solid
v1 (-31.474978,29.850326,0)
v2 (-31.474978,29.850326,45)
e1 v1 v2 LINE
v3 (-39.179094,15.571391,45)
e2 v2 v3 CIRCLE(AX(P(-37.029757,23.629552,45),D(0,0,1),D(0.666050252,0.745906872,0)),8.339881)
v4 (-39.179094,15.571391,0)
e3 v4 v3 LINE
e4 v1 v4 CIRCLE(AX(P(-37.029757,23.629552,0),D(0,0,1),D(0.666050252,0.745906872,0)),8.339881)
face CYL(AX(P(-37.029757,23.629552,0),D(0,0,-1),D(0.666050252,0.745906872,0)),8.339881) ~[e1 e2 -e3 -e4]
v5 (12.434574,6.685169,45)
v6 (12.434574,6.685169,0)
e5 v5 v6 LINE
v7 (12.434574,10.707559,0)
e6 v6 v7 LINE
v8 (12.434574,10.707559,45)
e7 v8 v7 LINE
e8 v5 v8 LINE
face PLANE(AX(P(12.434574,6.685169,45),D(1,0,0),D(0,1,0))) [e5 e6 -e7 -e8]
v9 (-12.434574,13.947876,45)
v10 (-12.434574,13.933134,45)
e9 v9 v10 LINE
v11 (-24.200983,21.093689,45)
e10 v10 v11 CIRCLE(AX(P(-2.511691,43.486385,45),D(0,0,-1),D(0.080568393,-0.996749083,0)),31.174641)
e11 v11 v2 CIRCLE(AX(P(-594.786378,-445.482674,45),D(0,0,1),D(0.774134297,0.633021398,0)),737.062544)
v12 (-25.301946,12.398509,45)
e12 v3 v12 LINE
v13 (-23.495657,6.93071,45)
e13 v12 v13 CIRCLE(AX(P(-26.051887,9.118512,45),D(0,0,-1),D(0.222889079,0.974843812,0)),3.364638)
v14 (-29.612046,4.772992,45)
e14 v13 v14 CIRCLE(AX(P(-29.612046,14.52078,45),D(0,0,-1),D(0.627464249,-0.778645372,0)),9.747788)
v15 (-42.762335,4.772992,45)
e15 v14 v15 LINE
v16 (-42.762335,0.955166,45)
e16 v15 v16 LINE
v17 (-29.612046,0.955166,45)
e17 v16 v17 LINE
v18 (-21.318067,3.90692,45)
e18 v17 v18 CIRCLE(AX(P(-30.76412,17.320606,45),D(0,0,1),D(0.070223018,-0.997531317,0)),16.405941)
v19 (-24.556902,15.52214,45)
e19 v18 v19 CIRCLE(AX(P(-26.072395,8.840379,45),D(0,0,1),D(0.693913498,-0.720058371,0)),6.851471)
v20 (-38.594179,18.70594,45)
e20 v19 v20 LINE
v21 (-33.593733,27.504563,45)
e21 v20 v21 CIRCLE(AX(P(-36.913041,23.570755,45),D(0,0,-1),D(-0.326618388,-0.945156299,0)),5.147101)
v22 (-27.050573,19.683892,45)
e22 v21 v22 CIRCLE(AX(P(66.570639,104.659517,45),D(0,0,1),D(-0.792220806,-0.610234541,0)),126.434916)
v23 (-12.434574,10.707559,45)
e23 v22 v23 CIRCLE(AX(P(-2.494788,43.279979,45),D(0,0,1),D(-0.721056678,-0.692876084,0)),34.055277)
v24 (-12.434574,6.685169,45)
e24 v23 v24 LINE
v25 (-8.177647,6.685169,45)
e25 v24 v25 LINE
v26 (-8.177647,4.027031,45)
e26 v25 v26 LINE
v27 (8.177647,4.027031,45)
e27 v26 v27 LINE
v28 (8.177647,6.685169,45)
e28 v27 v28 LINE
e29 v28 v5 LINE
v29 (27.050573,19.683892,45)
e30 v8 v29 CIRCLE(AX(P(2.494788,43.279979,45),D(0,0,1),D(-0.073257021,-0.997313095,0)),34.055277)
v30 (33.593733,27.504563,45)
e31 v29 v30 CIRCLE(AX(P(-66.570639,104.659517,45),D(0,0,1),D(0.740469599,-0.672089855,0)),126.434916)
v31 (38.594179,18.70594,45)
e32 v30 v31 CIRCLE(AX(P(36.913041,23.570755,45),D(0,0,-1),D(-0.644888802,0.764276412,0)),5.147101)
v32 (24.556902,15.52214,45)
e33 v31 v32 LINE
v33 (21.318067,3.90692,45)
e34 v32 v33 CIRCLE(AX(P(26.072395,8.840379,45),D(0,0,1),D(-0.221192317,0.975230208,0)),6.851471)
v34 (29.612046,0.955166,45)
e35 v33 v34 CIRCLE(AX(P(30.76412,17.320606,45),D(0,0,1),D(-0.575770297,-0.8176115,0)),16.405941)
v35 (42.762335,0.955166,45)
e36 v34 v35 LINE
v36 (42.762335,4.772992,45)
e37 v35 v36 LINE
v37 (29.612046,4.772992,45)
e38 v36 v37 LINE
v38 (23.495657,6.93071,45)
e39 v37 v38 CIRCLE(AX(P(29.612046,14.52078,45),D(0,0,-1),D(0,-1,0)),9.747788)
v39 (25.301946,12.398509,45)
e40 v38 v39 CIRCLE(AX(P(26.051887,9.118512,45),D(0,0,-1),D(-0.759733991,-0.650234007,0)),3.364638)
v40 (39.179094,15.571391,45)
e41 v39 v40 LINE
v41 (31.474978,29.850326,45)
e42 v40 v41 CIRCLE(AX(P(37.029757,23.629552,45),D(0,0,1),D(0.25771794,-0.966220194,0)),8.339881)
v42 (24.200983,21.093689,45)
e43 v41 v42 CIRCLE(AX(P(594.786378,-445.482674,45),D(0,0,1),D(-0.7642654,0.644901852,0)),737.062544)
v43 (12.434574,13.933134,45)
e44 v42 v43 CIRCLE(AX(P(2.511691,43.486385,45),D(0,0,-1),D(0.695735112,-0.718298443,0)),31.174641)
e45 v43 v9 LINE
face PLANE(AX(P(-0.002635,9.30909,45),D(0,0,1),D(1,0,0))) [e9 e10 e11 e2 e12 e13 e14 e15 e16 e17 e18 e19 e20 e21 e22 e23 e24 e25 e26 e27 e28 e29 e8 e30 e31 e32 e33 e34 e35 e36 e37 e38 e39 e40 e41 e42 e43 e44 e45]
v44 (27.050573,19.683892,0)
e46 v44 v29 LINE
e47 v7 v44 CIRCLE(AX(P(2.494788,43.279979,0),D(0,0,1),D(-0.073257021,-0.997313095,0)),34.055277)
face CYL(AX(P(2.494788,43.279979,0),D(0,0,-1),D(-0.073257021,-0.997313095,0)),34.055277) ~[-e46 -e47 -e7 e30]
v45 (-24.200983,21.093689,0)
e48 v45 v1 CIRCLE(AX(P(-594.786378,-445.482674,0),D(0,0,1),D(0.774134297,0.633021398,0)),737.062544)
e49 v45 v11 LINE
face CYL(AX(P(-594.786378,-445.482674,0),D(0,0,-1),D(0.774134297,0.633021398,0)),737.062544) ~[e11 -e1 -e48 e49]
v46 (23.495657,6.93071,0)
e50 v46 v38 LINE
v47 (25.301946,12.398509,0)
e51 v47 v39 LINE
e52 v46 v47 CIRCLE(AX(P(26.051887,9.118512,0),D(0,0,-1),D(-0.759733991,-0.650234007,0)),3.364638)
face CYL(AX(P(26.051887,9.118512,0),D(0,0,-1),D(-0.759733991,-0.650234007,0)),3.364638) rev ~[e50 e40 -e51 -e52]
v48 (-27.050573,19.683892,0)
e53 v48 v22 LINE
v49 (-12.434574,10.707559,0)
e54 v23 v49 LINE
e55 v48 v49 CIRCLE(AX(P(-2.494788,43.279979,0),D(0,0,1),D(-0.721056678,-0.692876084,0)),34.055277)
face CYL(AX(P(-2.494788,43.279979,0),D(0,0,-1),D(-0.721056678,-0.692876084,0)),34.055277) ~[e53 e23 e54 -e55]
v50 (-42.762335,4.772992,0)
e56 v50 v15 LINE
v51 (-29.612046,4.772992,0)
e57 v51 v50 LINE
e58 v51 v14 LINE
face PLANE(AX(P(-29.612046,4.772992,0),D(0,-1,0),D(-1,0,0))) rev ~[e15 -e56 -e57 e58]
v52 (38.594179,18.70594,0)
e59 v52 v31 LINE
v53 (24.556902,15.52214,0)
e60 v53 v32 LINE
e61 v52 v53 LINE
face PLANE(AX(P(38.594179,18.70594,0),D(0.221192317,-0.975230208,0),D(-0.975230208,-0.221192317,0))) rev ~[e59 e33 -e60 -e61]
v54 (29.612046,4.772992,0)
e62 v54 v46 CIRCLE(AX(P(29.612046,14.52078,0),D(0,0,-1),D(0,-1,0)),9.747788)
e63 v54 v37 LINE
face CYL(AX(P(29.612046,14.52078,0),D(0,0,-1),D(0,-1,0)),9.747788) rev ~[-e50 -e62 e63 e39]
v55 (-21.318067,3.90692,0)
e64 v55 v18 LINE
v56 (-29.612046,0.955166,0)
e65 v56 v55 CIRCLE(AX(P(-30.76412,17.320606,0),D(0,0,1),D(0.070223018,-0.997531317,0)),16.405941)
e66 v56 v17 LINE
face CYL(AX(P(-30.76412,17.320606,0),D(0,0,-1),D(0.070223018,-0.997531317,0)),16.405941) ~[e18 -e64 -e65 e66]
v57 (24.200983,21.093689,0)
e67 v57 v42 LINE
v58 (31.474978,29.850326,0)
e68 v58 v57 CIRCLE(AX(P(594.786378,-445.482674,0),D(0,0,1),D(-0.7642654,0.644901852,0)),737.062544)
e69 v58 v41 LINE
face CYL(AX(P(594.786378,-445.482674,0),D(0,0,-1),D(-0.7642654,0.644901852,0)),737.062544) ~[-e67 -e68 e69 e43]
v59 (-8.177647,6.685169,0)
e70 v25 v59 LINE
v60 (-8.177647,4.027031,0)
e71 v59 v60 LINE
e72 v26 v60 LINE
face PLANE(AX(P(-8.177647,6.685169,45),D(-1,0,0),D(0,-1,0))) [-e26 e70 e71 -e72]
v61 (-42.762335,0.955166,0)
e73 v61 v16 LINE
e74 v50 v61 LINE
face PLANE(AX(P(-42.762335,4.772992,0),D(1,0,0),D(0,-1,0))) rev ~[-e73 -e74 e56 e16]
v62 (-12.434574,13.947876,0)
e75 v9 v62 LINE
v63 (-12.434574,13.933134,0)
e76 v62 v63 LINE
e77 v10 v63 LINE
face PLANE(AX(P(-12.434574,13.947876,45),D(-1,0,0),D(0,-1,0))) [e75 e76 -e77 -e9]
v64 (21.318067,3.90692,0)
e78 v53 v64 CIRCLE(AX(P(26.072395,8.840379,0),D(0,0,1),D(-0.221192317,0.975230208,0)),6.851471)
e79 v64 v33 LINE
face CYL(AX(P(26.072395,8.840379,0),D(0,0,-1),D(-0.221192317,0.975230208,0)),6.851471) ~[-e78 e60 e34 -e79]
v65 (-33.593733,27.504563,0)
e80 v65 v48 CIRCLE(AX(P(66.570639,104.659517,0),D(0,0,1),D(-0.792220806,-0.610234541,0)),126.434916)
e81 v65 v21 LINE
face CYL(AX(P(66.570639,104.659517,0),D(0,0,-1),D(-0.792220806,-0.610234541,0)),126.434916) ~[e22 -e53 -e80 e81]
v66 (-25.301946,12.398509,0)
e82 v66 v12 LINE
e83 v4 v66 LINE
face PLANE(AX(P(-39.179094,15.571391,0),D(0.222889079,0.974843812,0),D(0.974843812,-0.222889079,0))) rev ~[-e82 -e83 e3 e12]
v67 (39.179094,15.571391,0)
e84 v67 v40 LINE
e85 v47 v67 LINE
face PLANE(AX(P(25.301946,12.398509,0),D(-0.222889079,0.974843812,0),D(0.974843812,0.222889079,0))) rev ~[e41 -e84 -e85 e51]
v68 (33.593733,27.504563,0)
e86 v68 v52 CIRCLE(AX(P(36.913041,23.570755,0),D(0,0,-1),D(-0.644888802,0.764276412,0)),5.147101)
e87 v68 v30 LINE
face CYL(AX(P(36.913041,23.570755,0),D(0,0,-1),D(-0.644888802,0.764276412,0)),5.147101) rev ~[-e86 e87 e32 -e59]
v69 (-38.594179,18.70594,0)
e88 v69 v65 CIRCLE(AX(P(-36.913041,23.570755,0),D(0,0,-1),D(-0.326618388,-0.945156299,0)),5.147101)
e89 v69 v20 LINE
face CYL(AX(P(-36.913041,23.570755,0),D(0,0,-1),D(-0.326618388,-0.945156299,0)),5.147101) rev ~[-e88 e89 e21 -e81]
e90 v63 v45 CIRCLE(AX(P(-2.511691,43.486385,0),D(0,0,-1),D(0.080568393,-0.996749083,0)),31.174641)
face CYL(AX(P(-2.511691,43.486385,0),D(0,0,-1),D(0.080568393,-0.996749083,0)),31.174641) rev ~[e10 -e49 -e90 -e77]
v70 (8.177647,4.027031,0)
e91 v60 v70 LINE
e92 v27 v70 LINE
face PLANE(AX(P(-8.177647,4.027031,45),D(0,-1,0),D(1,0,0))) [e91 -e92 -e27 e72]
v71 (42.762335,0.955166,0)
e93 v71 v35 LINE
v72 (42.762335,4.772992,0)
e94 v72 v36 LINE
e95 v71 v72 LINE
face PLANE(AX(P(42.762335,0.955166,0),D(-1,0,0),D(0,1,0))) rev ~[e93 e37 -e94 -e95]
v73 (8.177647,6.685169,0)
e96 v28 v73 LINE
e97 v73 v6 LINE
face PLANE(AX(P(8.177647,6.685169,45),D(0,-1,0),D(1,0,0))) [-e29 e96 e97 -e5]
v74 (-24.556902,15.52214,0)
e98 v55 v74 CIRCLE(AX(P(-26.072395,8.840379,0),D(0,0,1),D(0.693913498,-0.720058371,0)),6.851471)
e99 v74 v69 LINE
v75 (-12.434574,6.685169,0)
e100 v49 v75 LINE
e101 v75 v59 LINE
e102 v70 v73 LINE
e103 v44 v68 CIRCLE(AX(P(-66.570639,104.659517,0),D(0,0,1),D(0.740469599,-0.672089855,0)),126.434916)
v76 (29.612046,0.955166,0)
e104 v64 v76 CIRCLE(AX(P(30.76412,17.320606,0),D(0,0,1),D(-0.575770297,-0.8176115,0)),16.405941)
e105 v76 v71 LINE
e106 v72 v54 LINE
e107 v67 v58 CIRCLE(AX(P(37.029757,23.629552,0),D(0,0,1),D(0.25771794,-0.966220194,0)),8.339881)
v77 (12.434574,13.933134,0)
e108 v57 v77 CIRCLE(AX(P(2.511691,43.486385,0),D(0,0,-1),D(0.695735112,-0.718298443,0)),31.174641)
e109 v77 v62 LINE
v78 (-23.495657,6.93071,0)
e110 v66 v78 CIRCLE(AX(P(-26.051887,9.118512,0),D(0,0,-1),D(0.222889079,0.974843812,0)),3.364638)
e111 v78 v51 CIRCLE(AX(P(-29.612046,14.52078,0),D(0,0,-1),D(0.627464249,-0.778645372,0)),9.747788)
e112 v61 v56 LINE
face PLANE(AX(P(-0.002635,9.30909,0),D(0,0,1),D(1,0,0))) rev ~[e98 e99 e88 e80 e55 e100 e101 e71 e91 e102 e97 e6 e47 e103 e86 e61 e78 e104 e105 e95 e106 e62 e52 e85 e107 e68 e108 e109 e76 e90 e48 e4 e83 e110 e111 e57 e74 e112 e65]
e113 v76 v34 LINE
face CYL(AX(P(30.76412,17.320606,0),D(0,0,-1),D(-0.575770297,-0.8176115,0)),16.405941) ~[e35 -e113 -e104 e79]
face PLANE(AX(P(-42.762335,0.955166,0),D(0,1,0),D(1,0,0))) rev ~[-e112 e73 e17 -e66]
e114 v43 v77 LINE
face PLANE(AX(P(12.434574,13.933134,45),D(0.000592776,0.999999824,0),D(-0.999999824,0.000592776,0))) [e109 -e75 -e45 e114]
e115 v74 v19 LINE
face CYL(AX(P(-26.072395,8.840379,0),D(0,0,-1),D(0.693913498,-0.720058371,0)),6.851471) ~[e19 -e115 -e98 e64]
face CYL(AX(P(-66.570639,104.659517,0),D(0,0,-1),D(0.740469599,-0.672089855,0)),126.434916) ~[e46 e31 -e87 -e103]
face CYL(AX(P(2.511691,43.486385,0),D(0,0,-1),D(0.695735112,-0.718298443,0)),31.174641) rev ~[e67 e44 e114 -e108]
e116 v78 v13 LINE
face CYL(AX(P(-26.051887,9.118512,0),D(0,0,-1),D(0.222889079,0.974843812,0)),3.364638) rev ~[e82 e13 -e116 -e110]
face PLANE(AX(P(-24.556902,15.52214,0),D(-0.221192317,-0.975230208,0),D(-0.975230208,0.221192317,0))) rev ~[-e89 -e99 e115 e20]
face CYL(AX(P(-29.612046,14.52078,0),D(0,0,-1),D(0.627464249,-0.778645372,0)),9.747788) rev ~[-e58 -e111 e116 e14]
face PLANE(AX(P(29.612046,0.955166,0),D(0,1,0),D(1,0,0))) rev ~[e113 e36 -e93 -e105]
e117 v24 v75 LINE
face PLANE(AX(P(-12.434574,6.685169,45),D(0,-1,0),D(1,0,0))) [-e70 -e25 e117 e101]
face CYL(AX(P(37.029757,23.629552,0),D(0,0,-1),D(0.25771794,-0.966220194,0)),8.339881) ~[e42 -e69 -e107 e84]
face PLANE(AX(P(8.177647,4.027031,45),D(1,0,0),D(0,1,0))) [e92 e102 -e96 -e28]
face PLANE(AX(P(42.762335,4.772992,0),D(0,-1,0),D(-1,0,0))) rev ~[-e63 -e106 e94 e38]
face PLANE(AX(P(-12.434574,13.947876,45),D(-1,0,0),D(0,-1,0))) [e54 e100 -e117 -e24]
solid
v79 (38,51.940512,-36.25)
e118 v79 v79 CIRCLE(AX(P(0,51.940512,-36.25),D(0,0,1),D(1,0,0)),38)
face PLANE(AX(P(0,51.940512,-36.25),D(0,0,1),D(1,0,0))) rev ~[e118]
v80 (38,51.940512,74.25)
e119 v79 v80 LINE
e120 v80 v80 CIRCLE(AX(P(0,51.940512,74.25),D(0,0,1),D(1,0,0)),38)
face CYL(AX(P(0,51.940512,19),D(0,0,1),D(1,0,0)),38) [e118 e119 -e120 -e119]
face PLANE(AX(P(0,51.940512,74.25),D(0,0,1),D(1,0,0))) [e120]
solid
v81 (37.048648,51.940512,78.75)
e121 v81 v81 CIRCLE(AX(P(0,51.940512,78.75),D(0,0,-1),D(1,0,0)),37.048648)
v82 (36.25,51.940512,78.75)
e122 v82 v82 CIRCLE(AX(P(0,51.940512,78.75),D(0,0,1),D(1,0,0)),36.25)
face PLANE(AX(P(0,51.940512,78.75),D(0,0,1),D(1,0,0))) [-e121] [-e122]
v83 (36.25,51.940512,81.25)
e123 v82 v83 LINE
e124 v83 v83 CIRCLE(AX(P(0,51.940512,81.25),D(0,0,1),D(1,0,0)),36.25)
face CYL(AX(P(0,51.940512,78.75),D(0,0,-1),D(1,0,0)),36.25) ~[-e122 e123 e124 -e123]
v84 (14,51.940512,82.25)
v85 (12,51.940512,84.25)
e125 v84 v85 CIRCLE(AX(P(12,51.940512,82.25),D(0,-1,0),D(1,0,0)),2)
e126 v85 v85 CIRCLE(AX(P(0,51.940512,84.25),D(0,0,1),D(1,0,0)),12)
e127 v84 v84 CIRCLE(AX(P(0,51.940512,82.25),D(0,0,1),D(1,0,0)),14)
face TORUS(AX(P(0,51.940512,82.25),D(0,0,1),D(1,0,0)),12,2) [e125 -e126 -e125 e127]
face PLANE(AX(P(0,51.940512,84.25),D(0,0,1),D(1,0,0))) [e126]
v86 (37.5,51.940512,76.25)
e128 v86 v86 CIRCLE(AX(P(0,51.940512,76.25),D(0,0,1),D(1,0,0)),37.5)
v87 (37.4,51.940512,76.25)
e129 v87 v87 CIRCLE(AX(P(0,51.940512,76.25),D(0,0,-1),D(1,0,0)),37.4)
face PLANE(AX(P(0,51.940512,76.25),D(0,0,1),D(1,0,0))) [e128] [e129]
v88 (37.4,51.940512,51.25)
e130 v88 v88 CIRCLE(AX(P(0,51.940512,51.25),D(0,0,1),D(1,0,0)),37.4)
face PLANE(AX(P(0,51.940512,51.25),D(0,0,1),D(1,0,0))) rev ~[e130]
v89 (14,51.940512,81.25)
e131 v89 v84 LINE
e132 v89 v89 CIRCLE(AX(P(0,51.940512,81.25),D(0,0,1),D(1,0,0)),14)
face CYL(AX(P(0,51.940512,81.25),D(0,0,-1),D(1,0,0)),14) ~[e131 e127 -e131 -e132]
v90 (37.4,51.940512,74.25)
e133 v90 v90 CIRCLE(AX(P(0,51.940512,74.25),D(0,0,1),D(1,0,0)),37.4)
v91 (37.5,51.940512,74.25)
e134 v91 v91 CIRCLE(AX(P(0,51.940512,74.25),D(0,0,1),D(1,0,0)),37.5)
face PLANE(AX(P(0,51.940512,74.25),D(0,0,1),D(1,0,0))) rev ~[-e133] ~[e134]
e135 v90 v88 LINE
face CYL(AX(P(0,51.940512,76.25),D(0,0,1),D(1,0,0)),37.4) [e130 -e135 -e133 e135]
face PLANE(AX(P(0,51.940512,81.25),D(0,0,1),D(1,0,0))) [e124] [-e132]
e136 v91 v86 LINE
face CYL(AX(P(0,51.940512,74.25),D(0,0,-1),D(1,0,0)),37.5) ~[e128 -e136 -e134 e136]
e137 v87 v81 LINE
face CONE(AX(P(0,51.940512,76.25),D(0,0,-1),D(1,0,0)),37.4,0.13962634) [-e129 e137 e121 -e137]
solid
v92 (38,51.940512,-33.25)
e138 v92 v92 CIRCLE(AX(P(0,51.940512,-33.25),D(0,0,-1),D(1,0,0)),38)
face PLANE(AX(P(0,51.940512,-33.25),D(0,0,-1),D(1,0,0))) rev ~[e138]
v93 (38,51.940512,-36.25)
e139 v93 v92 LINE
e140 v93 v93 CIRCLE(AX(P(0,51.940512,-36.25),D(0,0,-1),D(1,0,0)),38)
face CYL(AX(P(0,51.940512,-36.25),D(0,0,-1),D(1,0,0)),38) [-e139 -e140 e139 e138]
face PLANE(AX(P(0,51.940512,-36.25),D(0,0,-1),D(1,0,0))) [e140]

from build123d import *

# Parameters (mm, degrees)
F2_DEPTH       = 45
F4_R           = 38
F5_DEPTH       = 55.25
F7_DEPTH       = 45
F8_R           = 37.5
F9_DEPTH       = 2
F10_R          = 37.4
F11_DEPTH      = 2.5
F11_TAPER      = 8
F11_DEPTH_BACK = 25
F12_R          = 36.25
F13_DEPTH      = 2.5
F14_R          = 14
F5_FACE1_R     = 38
F15_DEPTH      = 3
F16_R          = 2


with BuildPart() as f2:
    # F1 (on Top) → F2 (new body)
    with BuildSketch(Plane.XY):
        with BuildLine():
            Line((-42.7623353899, 4.772992339), (-42.7623353899, 0.9551661788))
            Line((-42.7623353899, 0.9551661788), (-29.6120457351, 0.9551661788))
            ThreePointArc((-29.6120457351, 0.9551661788), (-25.2633665331, 1.8643256085), (-21.3180668652, 3.9069200866))
            ThreePointArc((-21.3180668652, 3.9069200866), (-19.4726981458, 10.6806652344), (-24.5569021704, 15.5221400588))
            Line((-24.5569021704, 15.5221400588), (-38.5941788554, 18.7059398741))
            ThreePointArc((-38.5941788554, 18.7059398741), (-41.3879536384, 26.1139438263), (-33.5937328637, 27.5045633316))
            ThreePointArc((-33.5937328637, 27.5045633316), (-30.4010264003, 23.5282383436), (-27.0505733788, 19.6838919073))
            ThreePointArc((-27.0505733788, 19.6838919073), (-14.6826563319, 11.4803283735), (0, 9.3162050471))
            ThreePointArc((0, 9.3162050471), (14.6826563319, 11.4803283735), (27.0505733788, 19.6838919073))
            ThreePointArc((27.0505733788, 19.6838919073), (30.4010264003, 23.5282383436), (33.5937328637, 27.5045633316))
            ThreePointArc((33.5937328637, 27.5045633316), (41.3879536384, 26.1139438263), (38.5941788554, 18.7059398741))
            Line((38.5941788554, 18.7059398741), (24.5569021704, 15.5221400588))
            ThreePointArc((24.5569021704, 15.5221400588), (19.4726981458, 10.6806652344), (21.3180668652, 3.9069200866))
            ThreePointArc((21.3180668652, 3.9069200866), (25.2633665331, 1.8643256085), (29.6120457351, 0.9551661788))
            Line((29.6120457351, 0.9551661788), (42.7623353899, 0.9551661788))
            Line((42.7623353899, 0.9551661788), (42.7623353899, 4.772992339))
            Line((42.7623353899, 4.772992339), (29.6120457351, 4.772992339))
            ThreePointArc((29.6120457351, 4.772992339), (26.3691321778, 5.3282354057), (23.4956573695, 6.9307102822))
            ThreePointArc((23.4956573695, 6.9307102822), (22.8570637764, 10.1739231369), (25.3019461508, 12.3985088452))
            Line((25.3019461508, 12.3985088452), (39.1790941358, 15.57139121))
            ThreePointArc((39.1790941358, 15.57139121), (44.369461521, 27.5896469324), (31.4749777317, 29.8503264785))
            ThreePointArc((31.4749777317, 29.8503264785), (27.8210747764, 25.4860510297), (24.2009833455, 21.0936889052))
            ThreePointArc((24.2009833455, 21.0936889052), (13.0370554513, 14.1423064512), (0, 12.4130900949))
            ThreePointArc((0, 12.4130900949), (-13.0370554513, 14.1423064512), (-24.2009833455, 21.0936889052))
            ThreePointArc((-24.2009833455, 21.0936889052), (-27.8210747764, 25.4860510297), (-31.4749777317, 29.8503264785))
            ThreePointArc((-31.4749777317, 29.8503264785), (-44.369461521, 27.5896469324), (-39.1790941358, 15.57139121))
            Line((-39.1790941358, 15.57139121), (-25.3019461508, 12.3985088452))
            ThreePointArc((-25.3019461508, 12.3985088452), (-22.8570637764, 10.1739231369), (-23.4956573695, 6.9307102822))
            ThreePointArc((-23.4956573695, 6.9307102822), (-26.3691321778, 5.3282354057), (-29.6120457351, 4.772992339))
            Line((-29.6120457351, 4.772992339), (-42.7623353899, 4.772992339))
        make_face()
    extrude(amount=F2_DEPTH)

    # F6 (on face) → F7 (join)
    with BuildSketch(Plane.XY.offset(45)):
        Polygon((12.4345744927, 6.6851694137), (12.4345744927, 13.9331343145), (-12.4345744927, 13.9478761571), (-12.4345744927, 6.6851694137), (-8.1776473671, 6.6851694137), (-8.1776473671, 4.027030806), (8.1776473671, 4.027030806), (8.1776473671, 6.6851694137), align=None)
    extrude(amount=-F7_DEPTH)


with BuildPart() as f5:
    # F4 (on offset) → F5 (new body, symmetric)
    with BuildSketch(Plane.XY.offset(19)):
        with Locations((0, 51.9405119121)):
            Circle(F4_R)
    extrude(amount=F5_DEPTH, both=True)


with BuildPart() as f9:
    # F8 (on face) → F9 (new body)
    with BuildSketch(Plane.XY.offset(74.25)):
        with Locations((0, 51.9405119121)):
            Circle(F8_R)
    extrude(amount=F9_DEPTH)

    # F10 (on face) → F11 (join, two sides)
    with BuildSketch(Plane.XY.offset(76.25)) as f11_sk:
        with Locations((0, 51.9405119121)):
            Circle(F10_R)
    extrude(amount=F11_DEPTH, taper=F11_TAPER)
    extrude(f11_sk.sketch, amount=-F11_DEPTH_BACK)

    # F12 (on face) → F13 (join)
    with BuildSketch(Plane.XY.offset(78.75)):
        with Locations((0, 51.9405119121)):
            Circle(F12_R)
    extrude(amount=F13_DEPTH)

    # F14 (on face) + F5_face1 (on face) → F15 (join)
    with BuildSketch(Plane.XY.offset(81.25)):
        with Locations((0, 51.9405119121)):
            Circle(F14_R)
    with BuildSketch(Plane(origin=(0, 51.9405119121, -36.25), x_dir=(1, 0, 0), z_dir=(0, 0, -1))):
        Circle(F5_FACE1_R)
    extrude(amount=F15_DEPTH, dir=(0, 0, 1))

    # F16
    f16_edges = [f9.edges().sort_by_distance(p)[0] for p in [
        (-14, 51.940512, 84.25),
    ]]
    fillet(f16_edges, radius=F16_R)


solid = Compound([f2.part, f5.part, f9.part])
